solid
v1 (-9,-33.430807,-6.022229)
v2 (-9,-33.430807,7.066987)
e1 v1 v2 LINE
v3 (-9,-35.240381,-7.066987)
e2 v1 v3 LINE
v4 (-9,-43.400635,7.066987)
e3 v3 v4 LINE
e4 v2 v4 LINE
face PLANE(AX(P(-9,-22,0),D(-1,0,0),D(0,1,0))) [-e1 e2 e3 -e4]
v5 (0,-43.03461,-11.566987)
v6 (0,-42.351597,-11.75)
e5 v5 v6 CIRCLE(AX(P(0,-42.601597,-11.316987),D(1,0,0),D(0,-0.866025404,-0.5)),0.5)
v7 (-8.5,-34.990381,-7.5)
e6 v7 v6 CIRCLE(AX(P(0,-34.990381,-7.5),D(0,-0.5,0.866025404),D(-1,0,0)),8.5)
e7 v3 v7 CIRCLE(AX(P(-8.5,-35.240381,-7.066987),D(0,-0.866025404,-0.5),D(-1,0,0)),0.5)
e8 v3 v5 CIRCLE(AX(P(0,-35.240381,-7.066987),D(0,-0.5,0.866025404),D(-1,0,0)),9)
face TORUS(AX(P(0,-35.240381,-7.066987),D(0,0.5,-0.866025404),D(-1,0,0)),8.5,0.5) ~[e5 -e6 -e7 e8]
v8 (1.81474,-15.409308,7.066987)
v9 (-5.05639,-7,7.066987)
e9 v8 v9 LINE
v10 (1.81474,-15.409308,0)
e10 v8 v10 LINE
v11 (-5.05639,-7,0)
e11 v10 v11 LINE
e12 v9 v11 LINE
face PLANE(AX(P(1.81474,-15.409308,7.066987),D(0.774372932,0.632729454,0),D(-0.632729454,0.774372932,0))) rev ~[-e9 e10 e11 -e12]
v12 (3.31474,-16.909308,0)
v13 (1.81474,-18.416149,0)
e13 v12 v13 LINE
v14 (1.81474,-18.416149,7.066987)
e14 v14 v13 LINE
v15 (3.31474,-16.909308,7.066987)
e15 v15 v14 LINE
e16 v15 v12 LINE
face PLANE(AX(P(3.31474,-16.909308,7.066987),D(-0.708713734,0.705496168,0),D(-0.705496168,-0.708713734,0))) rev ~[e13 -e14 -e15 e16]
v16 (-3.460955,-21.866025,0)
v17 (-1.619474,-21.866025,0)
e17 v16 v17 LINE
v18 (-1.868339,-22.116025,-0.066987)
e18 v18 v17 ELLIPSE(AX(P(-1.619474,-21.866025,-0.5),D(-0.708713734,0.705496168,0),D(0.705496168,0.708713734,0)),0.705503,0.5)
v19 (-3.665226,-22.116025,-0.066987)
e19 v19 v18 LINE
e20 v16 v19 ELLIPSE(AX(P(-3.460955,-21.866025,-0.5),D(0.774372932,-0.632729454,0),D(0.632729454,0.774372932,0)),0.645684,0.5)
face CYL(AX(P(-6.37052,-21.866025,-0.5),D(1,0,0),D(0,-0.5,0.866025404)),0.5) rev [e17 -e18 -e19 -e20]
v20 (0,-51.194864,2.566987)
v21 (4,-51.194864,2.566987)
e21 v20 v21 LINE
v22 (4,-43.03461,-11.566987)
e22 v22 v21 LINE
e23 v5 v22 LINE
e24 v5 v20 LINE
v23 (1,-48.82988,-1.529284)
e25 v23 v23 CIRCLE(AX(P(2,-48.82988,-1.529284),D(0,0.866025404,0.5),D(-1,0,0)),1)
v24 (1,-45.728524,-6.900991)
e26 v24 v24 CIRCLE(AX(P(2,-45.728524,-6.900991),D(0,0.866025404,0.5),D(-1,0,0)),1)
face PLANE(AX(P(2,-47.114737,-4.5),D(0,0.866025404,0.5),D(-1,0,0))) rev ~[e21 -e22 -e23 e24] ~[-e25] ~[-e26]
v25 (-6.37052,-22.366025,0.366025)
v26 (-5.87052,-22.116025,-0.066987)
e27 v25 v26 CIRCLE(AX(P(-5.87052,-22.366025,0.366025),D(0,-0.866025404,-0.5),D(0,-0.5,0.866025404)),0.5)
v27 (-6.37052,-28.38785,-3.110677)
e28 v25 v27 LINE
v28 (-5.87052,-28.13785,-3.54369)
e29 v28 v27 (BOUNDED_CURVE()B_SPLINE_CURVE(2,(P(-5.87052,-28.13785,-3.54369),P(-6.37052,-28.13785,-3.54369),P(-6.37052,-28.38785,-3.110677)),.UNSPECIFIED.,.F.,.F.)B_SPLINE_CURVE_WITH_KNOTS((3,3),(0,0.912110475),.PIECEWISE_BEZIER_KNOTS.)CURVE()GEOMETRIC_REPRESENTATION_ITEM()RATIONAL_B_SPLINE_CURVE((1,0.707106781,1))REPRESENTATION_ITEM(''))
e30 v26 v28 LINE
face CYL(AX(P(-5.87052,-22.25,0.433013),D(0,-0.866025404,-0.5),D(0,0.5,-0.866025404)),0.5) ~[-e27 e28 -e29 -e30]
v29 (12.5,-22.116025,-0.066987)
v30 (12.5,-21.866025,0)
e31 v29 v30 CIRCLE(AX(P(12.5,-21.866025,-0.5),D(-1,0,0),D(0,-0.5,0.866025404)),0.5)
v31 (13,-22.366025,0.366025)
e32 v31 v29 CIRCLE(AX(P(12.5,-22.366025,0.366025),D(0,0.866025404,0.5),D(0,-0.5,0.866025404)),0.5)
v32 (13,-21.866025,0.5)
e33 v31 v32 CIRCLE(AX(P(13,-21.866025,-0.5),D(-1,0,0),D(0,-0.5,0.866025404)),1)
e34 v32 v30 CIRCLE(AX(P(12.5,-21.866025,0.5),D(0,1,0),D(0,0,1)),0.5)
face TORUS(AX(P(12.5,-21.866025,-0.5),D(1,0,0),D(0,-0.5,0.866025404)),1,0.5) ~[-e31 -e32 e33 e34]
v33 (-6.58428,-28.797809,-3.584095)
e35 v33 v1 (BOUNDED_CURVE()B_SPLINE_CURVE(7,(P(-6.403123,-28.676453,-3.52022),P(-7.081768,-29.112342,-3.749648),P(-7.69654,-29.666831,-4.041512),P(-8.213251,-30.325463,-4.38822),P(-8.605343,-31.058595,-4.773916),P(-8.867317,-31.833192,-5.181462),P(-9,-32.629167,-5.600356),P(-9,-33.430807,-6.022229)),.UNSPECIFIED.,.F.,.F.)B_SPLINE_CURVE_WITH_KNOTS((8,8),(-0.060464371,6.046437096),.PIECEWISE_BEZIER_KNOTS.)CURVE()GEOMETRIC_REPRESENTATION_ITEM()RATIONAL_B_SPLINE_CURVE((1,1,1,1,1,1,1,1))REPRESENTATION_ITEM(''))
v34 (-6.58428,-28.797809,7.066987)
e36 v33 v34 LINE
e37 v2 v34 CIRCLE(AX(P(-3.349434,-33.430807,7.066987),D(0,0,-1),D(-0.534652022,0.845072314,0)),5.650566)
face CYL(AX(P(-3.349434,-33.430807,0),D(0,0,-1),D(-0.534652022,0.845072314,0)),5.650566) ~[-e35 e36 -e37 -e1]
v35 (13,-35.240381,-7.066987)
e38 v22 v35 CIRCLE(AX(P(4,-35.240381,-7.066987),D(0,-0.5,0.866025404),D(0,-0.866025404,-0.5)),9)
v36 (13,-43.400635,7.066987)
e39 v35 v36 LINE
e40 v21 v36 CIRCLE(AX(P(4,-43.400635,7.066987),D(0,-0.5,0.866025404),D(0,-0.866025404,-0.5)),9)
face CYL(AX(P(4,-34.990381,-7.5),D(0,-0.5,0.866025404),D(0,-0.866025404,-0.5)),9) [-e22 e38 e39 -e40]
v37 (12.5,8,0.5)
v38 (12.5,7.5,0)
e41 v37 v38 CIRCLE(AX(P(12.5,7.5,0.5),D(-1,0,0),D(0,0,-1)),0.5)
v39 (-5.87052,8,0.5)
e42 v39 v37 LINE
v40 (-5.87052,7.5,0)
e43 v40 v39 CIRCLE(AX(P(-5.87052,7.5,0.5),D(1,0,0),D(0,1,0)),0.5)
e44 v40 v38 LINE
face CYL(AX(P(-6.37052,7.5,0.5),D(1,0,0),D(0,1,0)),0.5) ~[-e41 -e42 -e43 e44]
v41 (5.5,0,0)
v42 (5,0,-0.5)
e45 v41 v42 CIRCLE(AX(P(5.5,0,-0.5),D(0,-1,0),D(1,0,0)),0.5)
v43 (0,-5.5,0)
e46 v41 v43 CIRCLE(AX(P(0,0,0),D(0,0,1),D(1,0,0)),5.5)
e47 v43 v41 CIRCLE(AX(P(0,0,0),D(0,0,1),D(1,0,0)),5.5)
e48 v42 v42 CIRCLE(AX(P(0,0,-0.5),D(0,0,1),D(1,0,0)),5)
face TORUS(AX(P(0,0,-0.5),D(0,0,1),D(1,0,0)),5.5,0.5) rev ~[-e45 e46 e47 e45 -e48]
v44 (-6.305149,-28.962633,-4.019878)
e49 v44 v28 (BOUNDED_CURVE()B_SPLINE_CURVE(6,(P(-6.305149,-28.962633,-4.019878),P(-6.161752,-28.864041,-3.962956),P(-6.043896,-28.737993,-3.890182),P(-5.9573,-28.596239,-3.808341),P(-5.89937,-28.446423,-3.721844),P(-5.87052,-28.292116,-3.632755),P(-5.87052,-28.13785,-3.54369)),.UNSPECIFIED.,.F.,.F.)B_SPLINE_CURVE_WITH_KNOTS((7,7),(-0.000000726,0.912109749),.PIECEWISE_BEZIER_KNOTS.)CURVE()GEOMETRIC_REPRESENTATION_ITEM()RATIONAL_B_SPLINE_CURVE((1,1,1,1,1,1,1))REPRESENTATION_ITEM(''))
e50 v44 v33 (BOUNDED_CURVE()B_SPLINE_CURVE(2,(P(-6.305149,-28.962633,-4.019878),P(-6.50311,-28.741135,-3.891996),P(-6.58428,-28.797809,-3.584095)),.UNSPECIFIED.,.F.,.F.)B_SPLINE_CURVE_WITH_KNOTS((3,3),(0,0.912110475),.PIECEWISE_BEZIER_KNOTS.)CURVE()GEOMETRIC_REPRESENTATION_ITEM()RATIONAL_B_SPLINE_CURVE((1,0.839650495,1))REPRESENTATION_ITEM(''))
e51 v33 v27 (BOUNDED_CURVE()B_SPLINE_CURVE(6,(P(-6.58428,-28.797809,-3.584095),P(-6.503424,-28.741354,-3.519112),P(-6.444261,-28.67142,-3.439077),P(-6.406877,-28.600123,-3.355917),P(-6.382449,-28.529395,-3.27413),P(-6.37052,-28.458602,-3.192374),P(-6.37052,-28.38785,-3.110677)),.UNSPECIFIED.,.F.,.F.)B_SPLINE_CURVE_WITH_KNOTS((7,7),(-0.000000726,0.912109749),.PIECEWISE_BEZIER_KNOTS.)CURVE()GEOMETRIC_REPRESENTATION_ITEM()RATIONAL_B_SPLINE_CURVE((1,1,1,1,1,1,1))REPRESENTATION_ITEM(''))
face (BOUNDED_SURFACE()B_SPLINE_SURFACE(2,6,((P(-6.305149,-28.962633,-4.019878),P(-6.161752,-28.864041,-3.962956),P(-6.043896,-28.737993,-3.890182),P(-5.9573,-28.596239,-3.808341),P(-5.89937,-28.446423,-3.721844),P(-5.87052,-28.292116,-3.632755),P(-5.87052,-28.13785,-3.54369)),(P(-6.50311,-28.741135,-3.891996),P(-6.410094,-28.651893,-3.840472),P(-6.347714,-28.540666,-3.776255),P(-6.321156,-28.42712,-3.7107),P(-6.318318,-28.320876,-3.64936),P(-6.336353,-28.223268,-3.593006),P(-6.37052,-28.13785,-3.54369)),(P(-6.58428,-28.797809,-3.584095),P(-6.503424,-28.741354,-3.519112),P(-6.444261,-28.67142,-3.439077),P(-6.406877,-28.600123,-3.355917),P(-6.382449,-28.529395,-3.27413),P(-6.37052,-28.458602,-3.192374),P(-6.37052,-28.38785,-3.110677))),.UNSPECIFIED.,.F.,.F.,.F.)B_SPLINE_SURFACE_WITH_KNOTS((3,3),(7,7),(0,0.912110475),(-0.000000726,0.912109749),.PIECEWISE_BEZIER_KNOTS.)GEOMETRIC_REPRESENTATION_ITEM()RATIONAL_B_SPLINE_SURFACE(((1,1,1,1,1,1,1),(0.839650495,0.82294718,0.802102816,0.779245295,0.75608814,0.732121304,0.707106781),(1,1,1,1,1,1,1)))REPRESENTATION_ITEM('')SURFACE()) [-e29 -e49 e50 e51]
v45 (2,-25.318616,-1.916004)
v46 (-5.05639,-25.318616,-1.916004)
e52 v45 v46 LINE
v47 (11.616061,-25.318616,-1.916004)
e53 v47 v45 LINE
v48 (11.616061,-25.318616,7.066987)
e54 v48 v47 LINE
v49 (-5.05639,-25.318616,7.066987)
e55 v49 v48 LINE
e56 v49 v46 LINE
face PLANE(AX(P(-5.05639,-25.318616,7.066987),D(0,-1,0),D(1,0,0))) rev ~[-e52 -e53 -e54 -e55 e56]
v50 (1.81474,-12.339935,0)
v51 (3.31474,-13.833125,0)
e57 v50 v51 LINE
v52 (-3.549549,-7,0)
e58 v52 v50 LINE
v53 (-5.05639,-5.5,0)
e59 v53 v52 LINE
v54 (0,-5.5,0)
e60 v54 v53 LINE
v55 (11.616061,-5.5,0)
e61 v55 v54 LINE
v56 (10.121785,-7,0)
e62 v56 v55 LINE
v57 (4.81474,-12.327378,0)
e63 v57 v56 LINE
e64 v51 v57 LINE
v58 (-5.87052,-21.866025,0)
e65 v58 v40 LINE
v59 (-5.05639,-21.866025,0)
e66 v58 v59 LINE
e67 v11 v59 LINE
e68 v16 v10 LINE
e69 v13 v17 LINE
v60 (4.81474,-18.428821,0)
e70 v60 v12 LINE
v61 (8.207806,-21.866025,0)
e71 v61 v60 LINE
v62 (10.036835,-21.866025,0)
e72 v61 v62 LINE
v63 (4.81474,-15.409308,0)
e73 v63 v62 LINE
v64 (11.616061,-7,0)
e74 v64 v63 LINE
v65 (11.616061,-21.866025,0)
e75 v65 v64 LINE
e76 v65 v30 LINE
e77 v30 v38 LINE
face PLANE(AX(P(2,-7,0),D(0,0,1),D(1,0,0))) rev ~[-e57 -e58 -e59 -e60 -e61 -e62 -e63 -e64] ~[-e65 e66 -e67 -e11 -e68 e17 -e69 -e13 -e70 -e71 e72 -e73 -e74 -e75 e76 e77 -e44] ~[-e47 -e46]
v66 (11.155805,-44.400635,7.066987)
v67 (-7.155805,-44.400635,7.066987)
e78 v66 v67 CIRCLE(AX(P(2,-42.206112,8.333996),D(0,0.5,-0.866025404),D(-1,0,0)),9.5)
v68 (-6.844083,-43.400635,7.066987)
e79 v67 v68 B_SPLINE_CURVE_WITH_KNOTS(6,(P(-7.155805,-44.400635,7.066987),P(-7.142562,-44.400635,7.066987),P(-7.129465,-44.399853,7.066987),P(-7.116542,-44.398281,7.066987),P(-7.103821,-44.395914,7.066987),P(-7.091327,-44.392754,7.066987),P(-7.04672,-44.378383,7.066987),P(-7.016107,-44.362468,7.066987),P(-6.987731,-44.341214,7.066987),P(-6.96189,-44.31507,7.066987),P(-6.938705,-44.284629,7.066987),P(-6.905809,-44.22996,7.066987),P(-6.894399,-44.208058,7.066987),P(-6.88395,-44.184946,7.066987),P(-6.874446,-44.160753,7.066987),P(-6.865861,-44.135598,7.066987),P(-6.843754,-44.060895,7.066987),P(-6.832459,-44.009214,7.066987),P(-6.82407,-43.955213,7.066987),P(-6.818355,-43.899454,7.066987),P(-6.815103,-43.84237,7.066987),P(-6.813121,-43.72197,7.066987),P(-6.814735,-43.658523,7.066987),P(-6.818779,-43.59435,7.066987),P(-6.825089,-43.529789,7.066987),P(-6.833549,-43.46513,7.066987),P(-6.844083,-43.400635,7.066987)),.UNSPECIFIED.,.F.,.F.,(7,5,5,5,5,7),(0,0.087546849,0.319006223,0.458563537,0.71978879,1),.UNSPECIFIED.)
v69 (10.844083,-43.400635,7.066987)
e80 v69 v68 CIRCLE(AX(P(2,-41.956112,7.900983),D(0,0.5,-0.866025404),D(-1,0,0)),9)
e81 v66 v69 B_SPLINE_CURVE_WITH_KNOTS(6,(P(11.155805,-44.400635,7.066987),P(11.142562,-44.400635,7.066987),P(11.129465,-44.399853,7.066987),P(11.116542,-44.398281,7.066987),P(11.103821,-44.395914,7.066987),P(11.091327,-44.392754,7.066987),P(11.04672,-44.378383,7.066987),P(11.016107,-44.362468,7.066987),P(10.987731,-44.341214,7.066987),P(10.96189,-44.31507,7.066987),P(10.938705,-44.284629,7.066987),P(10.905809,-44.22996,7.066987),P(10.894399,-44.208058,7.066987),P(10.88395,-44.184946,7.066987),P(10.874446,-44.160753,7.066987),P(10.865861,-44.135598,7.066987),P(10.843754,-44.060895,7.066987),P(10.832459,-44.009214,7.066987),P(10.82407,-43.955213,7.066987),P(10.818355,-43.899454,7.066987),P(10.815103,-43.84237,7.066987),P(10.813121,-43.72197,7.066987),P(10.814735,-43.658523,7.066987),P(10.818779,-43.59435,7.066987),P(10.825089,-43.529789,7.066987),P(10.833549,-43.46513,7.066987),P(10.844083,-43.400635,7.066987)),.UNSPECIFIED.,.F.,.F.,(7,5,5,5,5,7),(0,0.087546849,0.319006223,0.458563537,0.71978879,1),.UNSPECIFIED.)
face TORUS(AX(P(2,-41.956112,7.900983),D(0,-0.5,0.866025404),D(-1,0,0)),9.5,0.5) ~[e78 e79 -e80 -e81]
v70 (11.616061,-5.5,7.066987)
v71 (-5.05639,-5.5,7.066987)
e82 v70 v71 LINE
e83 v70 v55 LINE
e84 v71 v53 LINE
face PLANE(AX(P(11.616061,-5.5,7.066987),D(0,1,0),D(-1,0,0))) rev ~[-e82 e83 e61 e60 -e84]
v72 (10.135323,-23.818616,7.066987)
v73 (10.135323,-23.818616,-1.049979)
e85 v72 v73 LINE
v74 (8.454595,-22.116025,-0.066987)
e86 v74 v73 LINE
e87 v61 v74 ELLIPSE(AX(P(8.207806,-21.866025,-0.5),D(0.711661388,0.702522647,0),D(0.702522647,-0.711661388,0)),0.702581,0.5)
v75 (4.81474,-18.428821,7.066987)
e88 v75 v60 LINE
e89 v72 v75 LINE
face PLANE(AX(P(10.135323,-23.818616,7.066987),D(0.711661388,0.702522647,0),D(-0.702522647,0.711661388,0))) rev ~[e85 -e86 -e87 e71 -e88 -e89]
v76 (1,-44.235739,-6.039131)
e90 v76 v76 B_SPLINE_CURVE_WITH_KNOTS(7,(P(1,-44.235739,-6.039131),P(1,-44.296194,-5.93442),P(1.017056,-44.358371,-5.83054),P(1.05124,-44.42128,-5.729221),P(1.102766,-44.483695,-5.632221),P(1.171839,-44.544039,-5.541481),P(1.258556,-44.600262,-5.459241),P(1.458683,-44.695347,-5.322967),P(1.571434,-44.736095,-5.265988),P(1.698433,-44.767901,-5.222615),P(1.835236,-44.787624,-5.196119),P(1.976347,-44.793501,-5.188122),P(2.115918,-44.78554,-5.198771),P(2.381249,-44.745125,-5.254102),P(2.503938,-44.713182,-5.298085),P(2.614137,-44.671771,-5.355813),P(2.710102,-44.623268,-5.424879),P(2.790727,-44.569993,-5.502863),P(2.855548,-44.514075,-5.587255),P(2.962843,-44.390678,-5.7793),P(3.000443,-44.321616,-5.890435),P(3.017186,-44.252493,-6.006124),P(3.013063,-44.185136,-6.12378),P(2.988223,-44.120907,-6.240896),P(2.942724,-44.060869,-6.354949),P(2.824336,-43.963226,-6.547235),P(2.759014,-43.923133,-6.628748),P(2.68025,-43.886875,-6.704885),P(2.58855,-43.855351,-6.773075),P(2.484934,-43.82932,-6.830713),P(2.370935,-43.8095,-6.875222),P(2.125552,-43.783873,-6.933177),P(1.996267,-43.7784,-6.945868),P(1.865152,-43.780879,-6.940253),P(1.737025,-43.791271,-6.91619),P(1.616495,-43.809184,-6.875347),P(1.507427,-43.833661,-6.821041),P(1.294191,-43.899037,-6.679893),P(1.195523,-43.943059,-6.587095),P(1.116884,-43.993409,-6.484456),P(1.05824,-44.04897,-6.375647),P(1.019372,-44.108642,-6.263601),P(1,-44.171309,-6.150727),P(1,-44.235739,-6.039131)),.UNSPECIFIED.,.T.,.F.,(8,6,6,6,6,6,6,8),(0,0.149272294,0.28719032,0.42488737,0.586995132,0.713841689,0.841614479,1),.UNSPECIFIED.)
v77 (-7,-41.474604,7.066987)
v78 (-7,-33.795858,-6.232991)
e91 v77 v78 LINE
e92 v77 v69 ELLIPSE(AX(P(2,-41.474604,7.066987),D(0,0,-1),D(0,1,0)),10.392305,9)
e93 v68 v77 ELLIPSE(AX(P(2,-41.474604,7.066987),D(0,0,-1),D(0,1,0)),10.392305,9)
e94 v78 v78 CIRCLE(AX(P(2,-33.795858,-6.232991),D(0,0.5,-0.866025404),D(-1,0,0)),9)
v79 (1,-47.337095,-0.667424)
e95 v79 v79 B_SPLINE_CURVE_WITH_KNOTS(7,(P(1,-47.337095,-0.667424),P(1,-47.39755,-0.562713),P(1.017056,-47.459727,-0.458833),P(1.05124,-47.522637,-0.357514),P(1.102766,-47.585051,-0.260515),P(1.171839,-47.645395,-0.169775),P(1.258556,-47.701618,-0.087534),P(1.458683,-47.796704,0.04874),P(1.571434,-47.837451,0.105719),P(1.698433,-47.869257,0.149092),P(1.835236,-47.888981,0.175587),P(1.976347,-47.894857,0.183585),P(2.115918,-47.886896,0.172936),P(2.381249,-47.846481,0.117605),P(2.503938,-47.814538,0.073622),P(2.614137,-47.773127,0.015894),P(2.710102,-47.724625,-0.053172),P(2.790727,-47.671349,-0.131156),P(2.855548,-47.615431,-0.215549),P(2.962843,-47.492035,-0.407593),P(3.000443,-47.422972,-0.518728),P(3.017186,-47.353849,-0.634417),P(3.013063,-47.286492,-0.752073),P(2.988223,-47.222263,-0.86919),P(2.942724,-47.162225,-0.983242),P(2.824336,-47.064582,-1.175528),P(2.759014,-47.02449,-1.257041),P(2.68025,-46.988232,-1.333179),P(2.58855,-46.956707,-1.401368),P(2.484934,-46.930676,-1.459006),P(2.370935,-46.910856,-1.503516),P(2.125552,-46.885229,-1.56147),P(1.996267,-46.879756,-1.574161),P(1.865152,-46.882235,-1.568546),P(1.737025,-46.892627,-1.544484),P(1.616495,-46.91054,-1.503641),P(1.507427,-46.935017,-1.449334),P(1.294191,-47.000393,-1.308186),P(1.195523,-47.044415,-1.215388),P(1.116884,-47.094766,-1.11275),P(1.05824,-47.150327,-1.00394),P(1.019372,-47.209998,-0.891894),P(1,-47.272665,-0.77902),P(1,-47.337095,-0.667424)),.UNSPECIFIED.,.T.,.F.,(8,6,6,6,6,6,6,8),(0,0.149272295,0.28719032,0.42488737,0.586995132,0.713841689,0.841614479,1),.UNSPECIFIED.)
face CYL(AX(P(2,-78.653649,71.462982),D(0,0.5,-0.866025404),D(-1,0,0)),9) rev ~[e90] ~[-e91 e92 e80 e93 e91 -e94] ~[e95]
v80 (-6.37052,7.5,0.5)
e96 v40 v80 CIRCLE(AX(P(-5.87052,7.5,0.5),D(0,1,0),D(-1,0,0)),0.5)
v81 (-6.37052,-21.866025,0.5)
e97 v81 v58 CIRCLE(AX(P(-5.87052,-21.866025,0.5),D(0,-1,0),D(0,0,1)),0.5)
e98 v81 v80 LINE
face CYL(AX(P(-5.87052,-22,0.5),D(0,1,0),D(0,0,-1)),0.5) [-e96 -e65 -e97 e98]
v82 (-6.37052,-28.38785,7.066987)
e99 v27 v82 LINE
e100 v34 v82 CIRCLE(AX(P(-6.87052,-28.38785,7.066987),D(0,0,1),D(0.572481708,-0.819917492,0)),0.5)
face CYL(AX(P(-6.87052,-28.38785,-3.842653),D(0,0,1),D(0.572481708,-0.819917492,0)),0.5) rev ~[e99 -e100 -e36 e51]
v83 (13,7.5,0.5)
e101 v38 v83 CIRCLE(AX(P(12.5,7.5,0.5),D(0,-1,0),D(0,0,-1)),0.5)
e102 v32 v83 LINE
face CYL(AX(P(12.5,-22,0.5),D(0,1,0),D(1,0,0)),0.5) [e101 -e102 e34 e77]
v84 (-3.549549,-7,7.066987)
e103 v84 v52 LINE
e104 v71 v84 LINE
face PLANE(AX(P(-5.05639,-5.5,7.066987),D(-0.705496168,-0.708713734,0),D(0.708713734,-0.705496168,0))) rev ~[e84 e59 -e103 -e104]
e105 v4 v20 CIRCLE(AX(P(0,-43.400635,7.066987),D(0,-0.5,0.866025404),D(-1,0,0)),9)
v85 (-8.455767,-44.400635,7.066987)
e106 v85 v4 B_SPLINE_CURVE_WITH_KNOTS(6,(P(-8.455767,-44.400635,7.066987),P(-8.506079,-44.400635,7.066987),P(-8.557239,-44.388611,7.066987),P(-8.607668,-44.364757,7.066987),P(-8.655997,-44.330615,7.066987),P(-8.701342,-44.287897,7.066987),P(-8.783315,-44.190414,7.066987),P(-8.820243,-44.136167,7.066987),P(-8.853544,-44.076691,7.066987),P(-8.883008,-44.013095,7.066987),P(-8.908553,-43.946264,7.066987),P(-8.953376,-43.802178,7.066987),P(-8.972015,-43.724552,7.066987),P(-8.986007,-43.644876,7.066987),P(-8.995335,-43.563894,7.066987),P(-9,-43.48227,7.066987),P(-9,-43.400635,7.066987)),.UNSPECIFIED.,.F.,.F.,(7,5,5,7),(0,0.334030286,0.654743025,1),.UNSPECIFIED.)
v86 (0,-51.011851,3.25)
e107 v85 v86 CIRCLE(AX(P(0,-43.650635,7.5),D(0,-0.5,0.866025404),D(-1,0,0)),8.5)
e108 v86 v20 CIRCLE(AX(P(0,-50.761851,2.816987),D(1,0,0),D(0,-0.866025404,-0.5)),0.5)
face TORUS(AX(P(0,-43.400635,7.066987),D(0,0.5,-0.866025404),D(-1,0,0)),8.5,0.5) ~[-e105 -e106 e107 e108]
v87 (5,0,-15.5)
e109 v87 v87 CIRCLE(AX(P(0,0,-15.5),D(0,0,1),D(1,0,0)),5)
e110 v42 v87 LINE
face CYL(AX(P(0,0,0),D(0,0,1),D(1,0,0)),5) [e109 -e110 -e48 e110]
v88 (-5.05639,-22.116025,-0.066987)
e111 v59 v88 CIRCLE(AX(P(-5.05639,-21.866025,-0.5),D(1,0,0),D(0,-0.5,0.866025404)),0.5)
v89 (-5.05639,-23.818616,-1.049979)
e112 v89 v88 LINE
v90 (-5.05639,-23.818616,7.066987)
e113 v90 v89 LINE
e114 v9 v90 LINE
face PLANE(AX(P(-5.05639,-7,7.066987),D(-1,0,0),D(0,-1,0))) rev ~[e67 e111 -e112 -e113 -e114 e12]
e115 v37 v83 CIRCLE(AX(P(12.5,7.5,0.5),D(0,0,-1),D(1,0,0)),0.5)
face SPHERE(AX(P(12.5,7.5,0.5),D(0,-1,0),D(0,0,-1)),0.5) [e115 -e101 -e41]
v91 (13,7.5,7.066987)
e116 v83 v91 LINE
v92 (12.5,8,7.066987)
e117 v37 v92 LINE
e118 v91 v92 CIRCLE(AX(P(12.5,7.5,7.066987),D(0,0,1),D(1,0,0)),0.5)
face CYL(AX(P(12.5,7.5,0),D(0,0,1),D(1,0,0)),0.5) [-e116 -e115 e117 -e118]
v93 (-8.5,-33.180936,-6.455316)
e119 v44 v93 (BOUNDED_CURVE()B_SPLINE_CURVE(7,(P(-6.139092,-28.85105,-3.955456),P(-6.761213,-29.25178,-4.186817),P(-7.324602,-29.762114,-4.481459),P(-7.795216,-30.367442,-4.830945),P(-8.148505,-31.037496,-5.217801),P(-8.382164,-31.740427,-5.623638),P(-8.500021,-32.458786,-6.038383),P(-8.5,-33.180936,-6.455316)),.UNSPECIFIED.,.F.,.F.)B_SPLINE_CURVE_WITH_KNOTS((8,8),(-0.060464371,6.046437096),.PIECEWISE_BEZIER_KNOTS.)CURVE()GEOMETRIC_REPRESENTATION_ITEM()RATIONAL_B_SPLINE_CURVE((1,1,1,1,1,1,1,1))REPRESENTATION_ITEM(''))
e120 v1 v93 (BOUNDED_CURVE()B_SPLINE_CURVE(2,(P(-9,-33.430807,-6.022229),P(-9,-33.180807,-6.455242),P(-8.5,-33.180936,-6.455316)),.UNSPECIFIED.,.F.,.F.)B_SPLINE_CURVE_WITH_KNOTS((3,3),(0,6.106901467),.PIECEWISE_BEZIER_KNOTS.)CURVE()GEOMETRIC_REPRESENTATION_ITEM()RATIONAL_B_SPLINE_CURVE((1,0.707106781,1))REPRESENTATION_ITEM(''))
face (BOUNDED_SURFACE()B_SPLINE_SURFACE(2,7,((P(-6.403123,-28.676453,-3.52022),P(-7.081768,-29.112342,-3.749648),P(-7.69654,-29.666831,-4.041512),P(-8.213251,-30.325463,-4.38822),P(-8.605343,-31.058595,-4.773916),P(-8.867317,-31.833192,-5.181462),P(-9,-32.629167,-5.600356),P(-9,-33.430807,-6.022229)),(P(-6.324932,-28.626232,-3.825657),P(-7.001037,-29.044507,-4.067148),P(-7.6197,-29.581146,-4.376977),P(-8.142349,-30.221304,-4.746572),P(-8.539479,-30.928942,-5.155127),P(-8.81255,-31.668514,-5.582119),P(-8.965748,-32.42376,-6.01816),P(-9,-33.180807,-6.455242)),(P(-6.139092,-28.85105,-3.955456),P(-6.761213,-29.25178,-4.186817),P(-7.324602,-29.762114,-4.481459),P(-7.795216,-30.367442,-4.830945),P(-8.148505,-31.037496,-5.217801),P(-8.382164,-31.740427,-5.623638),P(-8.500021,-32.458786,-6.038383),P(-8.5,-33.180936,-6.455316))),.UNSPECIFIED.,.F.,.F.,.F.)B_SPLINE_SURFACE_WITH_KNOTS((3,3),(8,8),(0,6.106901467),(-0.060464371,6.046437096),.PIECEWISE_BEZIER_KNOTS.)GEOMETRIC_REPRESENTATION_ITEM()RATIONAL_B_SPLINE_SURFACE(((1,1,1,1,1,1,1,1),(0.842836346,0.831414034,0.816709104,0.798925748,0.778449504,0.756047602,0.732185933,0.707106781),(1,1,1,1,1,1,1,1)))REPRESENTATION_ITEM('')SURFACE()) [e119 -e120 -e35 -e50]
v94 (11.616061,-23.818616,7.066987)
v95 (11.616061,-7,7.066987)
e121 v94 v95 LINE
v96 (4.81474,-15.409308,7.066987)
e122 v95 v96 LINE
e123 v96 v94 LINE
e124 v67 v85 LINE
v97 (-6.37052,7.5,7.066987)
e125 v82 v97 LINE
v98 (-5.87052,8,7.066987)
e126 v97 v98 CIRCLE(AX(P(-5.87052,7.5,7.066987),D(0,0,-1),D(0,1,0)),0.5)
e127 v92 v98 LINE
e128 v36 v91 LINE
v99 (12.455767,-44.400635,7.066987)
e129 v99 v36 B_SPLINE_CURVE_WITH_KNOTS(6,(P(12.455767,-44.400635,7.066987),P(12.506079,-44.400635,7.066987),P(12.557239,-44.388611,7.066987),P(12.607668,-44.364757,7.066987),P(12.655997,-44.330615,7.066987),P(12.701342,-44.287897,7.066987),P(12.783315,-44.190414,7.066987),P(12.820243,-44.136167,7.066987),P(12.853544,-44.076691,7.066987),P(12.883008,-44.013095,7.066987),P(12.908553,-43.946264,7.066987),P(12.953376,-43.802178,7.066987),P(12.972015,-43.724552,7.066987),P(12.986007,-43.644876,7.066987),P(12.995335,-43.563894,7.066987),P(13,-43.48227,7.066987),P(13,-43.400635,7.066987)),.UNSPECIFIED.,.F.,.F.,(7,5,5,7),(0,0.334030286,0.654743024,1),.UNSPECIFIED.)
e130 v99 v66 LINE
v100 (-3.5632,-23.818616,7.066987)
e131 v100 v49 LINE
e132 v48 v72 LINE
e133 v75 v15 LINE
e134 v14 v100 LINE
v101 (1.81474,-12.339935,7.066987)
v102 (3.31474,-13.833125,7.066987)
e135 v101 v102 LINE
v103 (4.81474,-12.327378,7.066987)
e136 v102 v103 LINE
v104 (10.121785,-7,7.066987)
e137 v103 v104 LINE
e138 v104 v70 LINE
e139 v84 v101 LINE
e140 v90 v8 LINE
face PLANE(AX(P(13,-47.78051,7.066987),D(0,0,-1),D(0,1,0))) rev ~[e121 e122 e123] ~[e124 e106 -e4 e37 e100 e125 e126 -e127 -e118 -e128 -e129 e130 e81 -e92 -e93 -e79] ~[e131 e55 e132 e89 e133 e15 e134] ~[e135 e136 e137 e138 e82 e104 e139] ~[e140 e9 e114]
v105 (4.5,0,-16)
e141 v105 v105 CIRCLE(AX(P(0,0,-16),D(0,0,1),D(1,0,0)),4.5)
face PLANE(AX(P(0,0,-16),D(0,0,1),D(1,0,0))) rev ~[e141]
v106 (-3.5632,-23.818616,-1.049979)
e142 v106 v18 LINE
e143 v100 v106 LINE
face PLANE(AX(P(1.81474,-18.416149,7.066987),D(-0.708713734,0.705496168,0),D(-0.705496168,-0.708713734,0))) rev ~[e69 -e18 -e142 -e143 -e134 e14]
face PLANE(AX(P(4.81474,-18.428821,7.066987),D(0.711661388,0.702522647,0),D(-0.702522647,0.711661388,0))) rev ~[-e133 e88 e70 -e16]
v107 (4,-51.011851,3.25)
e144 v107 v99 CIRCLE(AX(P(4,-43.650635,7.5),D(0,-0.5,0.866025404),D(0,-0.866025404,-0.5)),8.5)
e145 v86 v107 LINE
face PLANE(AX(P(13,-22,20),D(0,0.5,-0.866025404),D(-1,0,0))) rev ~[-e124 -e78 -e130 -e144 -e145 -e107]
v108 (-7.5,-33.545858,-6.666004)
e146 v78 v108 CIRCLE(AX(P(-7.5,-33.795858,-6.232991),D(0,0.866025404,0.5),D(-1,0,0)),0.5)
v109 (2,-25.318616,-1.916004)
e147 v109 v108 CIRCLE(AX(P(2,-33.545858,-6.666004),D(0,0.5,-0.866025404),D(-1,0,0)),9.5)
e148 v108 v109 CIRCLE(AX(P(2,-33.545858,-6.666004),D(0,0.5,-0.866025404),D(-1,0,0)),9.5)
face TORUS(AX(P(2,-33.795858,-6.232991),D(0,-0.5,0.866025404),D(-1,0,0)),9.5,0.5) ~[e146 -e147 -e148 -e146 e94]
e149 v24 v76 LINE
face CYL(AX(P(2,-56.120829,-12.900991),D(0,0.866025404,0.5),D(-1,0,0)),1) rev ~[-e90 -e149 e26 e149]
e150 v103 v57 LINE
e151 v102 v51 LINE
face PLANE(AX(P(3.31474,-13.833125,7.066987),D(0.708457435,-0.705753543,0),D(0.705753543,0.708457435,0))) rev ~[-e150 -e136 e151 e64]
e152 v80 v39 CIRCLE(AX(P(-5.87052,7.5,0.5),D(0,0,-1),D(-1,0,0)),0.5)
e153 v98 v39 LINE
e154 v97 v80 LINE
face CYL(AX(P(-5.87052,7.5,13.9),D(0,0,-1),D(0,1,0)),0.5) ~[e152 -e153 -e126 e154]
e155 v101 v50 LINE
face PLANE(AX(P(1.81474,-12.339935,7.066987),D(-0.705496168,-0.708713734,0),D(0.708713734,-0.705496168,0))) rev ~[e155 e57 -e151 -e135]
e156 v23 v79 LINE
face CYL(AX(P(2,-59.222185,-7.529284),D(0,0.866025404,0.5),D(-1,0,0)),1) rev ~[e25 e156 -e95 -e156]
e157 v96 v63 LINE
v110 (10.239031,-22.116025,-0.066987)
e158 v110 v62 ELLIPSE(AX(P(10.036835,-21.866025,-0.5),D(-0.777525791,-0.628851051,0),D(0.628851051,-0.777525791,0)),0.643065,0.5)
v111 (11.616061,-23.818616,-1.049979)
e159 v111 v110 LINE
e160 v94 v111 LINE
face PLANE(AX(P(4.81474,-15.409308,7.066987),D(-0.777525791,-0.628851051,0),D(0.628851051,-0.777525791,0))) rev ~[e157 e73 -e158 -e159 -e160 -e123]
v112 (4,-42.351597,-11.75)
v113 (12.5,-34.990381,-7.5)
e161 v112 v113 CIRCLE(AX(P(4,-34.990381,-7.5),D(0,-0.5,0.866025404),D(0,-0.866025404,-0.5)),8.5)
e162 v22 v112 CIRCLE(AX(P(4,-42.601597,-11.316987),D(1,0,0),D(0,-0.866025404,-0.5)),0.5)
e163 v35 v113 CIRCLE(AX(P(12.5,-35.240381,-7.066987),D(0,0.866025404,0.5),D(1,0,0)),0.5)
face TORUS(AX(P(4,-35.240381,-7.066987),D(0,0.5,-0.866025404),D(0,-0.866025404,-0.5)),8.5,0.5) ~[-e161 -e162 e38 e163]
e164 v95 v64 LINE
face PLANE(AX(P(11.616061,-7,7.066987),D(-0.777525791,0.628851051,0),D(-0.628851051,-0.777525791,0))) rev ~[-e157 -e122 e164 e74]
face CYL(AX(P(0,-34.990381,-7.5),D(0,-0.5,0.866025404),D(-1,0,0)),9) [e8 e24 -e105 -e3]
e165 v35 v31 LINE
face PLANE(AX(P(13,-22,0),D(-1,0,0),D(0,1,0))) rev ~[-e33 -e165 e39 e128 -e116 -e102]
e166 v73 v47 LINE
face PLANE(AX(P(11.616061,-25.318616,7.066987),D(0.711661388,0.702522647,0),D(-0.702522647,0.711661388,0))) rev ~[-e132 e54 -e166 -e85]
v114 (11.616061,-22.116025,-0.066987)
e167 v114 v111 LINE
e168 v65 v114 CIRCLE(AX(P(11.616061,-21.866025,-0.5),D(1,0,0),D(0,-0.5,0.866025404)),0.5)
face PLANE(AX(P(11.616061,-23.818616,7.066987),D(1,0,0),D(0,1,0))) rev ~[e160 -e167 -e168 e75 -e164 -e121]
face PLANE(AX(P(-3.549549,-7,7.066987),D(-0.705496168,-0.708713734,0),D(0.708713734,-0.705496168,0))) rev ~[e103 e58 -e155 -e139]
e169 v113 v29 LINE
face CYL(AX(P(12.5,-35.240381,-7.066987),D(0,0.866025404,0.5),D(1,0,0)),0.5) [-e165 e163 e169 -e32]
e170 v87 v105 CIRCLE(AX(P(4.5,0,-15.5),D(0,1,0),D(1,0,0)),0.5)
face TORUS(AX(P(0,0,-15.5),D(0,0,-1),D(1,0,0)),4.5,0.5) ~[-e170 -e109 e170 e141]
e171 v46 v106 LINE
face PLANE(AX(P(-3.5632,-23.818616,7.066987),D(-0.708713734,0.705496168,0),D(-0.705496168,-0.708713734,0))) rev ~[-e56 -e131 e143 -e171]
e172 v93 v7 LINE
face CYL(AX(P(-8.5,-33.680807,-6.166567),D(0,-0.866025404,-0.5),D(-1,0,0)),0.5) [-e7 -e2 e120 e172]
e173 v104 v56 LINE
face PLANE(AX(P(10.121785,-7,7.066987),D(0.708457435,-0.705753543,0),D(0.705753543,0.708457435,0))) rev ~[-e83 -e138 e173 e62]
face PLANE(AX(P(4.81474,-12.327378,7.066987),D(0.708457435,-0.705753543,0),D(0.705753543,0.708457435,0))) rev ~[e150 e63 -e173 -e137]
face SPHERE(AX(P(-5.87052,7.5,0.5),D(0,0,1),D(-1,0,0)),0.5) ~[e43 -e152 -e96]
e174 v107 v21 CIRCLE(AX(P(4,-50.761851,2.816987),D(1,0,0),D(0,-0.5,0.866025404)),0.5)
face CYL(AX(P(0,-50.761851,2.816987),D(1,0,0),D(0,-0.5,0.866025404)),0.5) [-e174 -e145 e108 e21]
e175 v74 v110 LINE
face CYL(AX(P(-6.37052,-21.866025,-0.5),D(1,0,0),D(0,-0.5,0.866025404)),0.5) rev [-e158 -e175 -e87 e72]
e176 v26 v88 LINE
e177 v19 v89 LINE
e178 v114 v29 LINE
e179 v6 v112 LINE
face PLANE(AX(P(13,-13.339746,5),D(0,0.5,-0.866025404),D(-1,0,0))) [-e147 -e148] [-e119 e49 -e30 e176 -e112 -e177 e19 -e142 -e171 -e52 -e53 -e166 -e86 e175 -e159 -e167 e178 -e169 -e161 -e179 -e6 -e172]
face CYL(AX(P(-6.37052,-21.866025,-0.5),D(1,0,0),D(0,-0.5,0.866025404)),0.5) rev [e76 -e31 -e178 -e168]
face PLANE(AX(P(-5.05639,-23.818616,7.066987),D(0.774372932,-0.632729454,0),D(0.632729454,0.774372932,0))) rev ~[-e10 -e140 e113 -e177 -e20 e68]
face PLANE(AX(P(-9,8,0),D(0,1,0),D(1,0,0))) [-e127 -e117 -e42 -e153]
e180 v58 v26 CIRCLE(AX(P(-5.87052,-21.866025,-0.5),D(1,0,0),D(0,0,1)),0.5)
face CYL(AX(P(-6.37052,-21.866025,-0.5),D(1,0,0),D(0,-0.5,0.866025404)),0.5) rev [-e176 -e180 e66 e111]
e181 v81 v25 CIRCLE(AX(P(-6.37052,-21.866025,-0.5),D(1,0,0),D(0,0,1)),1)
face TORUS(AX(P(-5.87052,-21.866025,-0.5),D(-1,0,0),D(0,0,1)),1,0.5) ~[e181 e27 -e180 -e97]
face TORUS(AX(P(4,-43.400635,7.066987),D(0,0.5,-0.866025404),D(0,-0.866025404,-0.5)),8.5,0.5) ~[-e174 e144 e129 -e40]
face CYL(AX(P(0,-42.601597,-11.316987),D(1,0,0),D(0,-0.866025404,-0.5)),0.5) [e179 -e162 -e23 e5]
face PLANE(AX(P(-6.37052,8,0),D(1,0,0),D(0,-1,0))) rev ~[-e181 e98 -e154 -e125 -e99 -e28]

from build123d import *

# Parameters (mm, degrees)
F0_R      = 5
F1_DEPTH  = 16
F3_W      = 22
F3_H      = 30
F4_DEPTH  = 20
F6_W      = 22
F6_H      = 17.3205080757
F7_DEPTH  = 34
F10_D     = 18
F13_D     = 2
F13_DEPTH = 12
F13_TIP   = 0.600860619
F14_D     = 2
F14_DEPTH = 12
F14_TIP   = 0.600860619
F16_W     = 22
F16_H     = 40.5655099262
F17_DEPTH = 25
F18_R     = 9
F19_R     = 9
F21_DEPTH = 19
F22_R     = 0.5
F23_W     = 61.5093680099
F23_H     = 7.1933913681
F24_DEPTH = 25
F25_W     = 3
F25_H     = 1.5
F26_DEPTH = 25


with BuildPart() as f1:
    # F0 (on Top) → F1 (new body)
    with BuildSketch(Plane.XY):
        Circle(F0_R)
    extrude(amount=-F1_DEPTH)

    # F3 (on Top) → F4 (join)
    with BuildSketch(Plane.XY):
        with Locations((2, -7)):
            Rectangle(F3_W, F3_H)
    extrude(amount=F4_DEPTH)

    # F6 (on face) → F7 (join)
    with BuildSketch(Plane(origin=(0, -7.8397459622, -4.5262794416), x_dir=(-1, 0, 0), z_dir=(0, 0.8660254038, 0.5))):
        with Locations((-2, 19.6602540378)):
            Rectangle(F6_W, F6_H)
    extrude(amount=-F7_DEPTH)

    # F10 (through all)
    with Locations(Plane(origin=(0, -14.1602540378, 24.5262794416), x_dir=(1, 0, 0), z_dir=(0, -0.5, 0.8660254038))):
        with Locations((2, -32.3845669627)):
            Hole(F10_D / 2)

    # F13
    with Locations(Plane(origin=(0, -37.2846096908, -21.5262794416), x_dir=(1, 0, 0), z_dir=(0, -0.8660254038, -0.5))):
        with Locations((2, 16.8878287077)):
            Hole(F13_D / 2, depth=F13_DEPTH)
            with Locations((0, 0, -(F13_DEPTH + F13_TIP / 2))):  # 118° drill point
                Cone(0, F13_D / 2, F13_TIP, mode=Mode.SUBTRACT)

    # F14
    with Locations(Plane(origin=(0, -37.2846096908, -21.5262794416), x_dir=(1, 0, 0), z_dir=(0, -0.8660254038, -0.5))):
        with Locations((2, 23.0905413628)):
            Hole(F14_D / 2, depth=F14_DEPTH)
            with Locations((0, 0, -(F14_DEPTH + F14_TIP / 2))):  # 118° drill point
                Cone(0, F14_D / 2, F14_TIP, mode=Mode.SUBTRACT)

    # F16 (on offset) → F17 (cut)
    with BuildSketch(Plane.XY.offset(13.9)):
        with Locations((2, -12.2827549631)):
            Rectangle(F16_W, F16_H)
    extrude(amount=F17_DEPTH, mode=Mode.SUBTRACT)

    # F18
    f18_edges = [f1.edges().sort_by_distance(p)[0] for p in [
        (-9, -47.114737, -4.5),
    ]]
    fillet(f18_edges, radius=F18_R)

    # F19
    f19_edges = [f1.edges().sort_by_distance(p)[0] for p in [
        (13, -47.114737, -4.5),
    ]]
    fillet(f19_edges, radius=F19_R)

    # F20 (on face) → F21 (cut, symmetric)
    with BuildSketch(Plane(origin=(0, 0, 0), x_dir=(1, 0, 0), z_dir=(0, 0, -1))):
        with BuildLine():
            Line((-9, 33.4308072925), (-9, -8))
            Line((-9, -8), (-6.3705204485, -8))
            Line((-6.3705204485, -8), (-6.3705204485, 28.6556702479))
            ThreePointArc((-6.3705204485, 28.6556702479), (-8.2991685647, 30.7051836709), (-9, 33.4308072925))
        make_face()
    extrude(amount=F21_DEPTH, both=True, mode=Mode.SUBTRACT)

    # F22
    f22_edges = [f1.edges().sort_by_distance(p)[0] for p in [
        (-6.363961, -49.161987, 4.318019),
        (-8.07524, -30.333122, 13.9),
        (13, -12.282755, 13.9),
        (2.033323, -32.56551, 13.9),
        (-6.37052, -10.327835, 13.9),
        (3.31474, 8, 13.9),
        (-6.37052, 8, 6.95),
        (-6.37052, -7, 0),
        (-6.37052, -25.327835, -1.921327),
        (-6.37052, -28.65567, 5.028673),
        (13, -7, 0),
        (3.31474, -22, 0),
        (3.31474, 8, 0),
        (-5, 0, 0),
        (13, 8, 6.95),
        (5, 0, -8),
        (-5, 0, -16),
        (10.363961, -40.501733, -10.681981),
        (13, -28.495191, -3.75),
        (-8.299169, -30.705184, -5.02594),
        (-9, -34.210594, -7.04979),
        (-6.363961, -40.501733, -10.681981),
        (2, -42.78461, -12),
        (-7, -33.545858, -6.666004),
        (10.363961, -49.161987, 4.318019),
        (2, -51.444864, 3),
        (-7, -42.206112, 8.333996),
    ]]
    fillet(f22_edges, radius=F22_R)

    # F23 (on face) → F24 (cut)
    with BuildSketch(Plane.YZ.offset(13)):
        with Locations((-17.0258260332, 10.6636829822)):
            Rectangle(F23_W, F23_H)
    extrude(amount=-F24_DEPTH, mode=Mode.SUBTRACT)

    # F25 (on face) → F26 (cut)
    with BuildSketch(Plane.XY.offset(7.0669872981)):
        Polygon((-3.5632000846, -23.8186163443), (-5.0563900732, -25.3186163443), (1.8147397757, -25.3186163443), (1.8147397757, -23.8186163443), align=None)
        Polygon((-5.0563900732, -7), (-5.0563900732, -23.8186163443), (1.8147397757, -15.4093081722), align=None)
        Polygon((1.8147397757, -18.4161492421), (-3.5632000846, -23.8186163443), (1.8147397757, -23.8186163443), align=None)
        with Locations((3.3147397757, -24.5686163443)):
            Rectangle(F25_W, F25_H)
        Polygon((3.3147397757, -16.9093081722), (1.8147397757, -18.4161492421), (1.8147397757, -23.8186163443), (4.8147397757, -23.8186163443), (4.8147397757, -18.4288208692), align=None)
        Polygon((4.8147397757, -23.8186163443), (4.8147397757, -25.3186163443), (11.6160605103, -25.3186163443), (10.1353226366, -23.8186163443), align=None)
        Polygon((1.8147397757, -5.5), (-5.0563900732, -5.5), (-3.5495490032, -7), (1.8147397757, -7), align=None)
        Polygon((1.8147397757, -7), (-3.5495490032, -7), (1.8147397757, -12.3399348669), align=None)
        Polygon((1.8147397757, -7), (1.8147397757, -12.3399348669), (3.3147397757, -13.8331248555), (4.8147397757, -12.3273780373), (4.8147397757, -7), align=None)
        Polygon((4.8147397757, -18.4288208692), (4.8147397757, -23.8186163443), (10.1353226366, -23.8186163443), align=None)
        with Locations((3.3147397757, -6.25)):
            Rectangle(F25_W, F25_H)
        Polygon((4.8147397757, -15.4093081722), (11.6160605103, -23.8186163443), (11.6160605103, -7), align=None)
        Polygon((11.6160605103, -5.5), (4.8147397757, -5.5), (4.8147397757, -7), (10.1217853953, -7), align=None)
        Polygon((10.1217853953, -7), (4.8147397757, -7), (4.8147397757, -12.3273780373), align=None)
    extrude(amount=-F26_DEPTH, mode=Mode.SUBTRACT)


solid = f1.part
